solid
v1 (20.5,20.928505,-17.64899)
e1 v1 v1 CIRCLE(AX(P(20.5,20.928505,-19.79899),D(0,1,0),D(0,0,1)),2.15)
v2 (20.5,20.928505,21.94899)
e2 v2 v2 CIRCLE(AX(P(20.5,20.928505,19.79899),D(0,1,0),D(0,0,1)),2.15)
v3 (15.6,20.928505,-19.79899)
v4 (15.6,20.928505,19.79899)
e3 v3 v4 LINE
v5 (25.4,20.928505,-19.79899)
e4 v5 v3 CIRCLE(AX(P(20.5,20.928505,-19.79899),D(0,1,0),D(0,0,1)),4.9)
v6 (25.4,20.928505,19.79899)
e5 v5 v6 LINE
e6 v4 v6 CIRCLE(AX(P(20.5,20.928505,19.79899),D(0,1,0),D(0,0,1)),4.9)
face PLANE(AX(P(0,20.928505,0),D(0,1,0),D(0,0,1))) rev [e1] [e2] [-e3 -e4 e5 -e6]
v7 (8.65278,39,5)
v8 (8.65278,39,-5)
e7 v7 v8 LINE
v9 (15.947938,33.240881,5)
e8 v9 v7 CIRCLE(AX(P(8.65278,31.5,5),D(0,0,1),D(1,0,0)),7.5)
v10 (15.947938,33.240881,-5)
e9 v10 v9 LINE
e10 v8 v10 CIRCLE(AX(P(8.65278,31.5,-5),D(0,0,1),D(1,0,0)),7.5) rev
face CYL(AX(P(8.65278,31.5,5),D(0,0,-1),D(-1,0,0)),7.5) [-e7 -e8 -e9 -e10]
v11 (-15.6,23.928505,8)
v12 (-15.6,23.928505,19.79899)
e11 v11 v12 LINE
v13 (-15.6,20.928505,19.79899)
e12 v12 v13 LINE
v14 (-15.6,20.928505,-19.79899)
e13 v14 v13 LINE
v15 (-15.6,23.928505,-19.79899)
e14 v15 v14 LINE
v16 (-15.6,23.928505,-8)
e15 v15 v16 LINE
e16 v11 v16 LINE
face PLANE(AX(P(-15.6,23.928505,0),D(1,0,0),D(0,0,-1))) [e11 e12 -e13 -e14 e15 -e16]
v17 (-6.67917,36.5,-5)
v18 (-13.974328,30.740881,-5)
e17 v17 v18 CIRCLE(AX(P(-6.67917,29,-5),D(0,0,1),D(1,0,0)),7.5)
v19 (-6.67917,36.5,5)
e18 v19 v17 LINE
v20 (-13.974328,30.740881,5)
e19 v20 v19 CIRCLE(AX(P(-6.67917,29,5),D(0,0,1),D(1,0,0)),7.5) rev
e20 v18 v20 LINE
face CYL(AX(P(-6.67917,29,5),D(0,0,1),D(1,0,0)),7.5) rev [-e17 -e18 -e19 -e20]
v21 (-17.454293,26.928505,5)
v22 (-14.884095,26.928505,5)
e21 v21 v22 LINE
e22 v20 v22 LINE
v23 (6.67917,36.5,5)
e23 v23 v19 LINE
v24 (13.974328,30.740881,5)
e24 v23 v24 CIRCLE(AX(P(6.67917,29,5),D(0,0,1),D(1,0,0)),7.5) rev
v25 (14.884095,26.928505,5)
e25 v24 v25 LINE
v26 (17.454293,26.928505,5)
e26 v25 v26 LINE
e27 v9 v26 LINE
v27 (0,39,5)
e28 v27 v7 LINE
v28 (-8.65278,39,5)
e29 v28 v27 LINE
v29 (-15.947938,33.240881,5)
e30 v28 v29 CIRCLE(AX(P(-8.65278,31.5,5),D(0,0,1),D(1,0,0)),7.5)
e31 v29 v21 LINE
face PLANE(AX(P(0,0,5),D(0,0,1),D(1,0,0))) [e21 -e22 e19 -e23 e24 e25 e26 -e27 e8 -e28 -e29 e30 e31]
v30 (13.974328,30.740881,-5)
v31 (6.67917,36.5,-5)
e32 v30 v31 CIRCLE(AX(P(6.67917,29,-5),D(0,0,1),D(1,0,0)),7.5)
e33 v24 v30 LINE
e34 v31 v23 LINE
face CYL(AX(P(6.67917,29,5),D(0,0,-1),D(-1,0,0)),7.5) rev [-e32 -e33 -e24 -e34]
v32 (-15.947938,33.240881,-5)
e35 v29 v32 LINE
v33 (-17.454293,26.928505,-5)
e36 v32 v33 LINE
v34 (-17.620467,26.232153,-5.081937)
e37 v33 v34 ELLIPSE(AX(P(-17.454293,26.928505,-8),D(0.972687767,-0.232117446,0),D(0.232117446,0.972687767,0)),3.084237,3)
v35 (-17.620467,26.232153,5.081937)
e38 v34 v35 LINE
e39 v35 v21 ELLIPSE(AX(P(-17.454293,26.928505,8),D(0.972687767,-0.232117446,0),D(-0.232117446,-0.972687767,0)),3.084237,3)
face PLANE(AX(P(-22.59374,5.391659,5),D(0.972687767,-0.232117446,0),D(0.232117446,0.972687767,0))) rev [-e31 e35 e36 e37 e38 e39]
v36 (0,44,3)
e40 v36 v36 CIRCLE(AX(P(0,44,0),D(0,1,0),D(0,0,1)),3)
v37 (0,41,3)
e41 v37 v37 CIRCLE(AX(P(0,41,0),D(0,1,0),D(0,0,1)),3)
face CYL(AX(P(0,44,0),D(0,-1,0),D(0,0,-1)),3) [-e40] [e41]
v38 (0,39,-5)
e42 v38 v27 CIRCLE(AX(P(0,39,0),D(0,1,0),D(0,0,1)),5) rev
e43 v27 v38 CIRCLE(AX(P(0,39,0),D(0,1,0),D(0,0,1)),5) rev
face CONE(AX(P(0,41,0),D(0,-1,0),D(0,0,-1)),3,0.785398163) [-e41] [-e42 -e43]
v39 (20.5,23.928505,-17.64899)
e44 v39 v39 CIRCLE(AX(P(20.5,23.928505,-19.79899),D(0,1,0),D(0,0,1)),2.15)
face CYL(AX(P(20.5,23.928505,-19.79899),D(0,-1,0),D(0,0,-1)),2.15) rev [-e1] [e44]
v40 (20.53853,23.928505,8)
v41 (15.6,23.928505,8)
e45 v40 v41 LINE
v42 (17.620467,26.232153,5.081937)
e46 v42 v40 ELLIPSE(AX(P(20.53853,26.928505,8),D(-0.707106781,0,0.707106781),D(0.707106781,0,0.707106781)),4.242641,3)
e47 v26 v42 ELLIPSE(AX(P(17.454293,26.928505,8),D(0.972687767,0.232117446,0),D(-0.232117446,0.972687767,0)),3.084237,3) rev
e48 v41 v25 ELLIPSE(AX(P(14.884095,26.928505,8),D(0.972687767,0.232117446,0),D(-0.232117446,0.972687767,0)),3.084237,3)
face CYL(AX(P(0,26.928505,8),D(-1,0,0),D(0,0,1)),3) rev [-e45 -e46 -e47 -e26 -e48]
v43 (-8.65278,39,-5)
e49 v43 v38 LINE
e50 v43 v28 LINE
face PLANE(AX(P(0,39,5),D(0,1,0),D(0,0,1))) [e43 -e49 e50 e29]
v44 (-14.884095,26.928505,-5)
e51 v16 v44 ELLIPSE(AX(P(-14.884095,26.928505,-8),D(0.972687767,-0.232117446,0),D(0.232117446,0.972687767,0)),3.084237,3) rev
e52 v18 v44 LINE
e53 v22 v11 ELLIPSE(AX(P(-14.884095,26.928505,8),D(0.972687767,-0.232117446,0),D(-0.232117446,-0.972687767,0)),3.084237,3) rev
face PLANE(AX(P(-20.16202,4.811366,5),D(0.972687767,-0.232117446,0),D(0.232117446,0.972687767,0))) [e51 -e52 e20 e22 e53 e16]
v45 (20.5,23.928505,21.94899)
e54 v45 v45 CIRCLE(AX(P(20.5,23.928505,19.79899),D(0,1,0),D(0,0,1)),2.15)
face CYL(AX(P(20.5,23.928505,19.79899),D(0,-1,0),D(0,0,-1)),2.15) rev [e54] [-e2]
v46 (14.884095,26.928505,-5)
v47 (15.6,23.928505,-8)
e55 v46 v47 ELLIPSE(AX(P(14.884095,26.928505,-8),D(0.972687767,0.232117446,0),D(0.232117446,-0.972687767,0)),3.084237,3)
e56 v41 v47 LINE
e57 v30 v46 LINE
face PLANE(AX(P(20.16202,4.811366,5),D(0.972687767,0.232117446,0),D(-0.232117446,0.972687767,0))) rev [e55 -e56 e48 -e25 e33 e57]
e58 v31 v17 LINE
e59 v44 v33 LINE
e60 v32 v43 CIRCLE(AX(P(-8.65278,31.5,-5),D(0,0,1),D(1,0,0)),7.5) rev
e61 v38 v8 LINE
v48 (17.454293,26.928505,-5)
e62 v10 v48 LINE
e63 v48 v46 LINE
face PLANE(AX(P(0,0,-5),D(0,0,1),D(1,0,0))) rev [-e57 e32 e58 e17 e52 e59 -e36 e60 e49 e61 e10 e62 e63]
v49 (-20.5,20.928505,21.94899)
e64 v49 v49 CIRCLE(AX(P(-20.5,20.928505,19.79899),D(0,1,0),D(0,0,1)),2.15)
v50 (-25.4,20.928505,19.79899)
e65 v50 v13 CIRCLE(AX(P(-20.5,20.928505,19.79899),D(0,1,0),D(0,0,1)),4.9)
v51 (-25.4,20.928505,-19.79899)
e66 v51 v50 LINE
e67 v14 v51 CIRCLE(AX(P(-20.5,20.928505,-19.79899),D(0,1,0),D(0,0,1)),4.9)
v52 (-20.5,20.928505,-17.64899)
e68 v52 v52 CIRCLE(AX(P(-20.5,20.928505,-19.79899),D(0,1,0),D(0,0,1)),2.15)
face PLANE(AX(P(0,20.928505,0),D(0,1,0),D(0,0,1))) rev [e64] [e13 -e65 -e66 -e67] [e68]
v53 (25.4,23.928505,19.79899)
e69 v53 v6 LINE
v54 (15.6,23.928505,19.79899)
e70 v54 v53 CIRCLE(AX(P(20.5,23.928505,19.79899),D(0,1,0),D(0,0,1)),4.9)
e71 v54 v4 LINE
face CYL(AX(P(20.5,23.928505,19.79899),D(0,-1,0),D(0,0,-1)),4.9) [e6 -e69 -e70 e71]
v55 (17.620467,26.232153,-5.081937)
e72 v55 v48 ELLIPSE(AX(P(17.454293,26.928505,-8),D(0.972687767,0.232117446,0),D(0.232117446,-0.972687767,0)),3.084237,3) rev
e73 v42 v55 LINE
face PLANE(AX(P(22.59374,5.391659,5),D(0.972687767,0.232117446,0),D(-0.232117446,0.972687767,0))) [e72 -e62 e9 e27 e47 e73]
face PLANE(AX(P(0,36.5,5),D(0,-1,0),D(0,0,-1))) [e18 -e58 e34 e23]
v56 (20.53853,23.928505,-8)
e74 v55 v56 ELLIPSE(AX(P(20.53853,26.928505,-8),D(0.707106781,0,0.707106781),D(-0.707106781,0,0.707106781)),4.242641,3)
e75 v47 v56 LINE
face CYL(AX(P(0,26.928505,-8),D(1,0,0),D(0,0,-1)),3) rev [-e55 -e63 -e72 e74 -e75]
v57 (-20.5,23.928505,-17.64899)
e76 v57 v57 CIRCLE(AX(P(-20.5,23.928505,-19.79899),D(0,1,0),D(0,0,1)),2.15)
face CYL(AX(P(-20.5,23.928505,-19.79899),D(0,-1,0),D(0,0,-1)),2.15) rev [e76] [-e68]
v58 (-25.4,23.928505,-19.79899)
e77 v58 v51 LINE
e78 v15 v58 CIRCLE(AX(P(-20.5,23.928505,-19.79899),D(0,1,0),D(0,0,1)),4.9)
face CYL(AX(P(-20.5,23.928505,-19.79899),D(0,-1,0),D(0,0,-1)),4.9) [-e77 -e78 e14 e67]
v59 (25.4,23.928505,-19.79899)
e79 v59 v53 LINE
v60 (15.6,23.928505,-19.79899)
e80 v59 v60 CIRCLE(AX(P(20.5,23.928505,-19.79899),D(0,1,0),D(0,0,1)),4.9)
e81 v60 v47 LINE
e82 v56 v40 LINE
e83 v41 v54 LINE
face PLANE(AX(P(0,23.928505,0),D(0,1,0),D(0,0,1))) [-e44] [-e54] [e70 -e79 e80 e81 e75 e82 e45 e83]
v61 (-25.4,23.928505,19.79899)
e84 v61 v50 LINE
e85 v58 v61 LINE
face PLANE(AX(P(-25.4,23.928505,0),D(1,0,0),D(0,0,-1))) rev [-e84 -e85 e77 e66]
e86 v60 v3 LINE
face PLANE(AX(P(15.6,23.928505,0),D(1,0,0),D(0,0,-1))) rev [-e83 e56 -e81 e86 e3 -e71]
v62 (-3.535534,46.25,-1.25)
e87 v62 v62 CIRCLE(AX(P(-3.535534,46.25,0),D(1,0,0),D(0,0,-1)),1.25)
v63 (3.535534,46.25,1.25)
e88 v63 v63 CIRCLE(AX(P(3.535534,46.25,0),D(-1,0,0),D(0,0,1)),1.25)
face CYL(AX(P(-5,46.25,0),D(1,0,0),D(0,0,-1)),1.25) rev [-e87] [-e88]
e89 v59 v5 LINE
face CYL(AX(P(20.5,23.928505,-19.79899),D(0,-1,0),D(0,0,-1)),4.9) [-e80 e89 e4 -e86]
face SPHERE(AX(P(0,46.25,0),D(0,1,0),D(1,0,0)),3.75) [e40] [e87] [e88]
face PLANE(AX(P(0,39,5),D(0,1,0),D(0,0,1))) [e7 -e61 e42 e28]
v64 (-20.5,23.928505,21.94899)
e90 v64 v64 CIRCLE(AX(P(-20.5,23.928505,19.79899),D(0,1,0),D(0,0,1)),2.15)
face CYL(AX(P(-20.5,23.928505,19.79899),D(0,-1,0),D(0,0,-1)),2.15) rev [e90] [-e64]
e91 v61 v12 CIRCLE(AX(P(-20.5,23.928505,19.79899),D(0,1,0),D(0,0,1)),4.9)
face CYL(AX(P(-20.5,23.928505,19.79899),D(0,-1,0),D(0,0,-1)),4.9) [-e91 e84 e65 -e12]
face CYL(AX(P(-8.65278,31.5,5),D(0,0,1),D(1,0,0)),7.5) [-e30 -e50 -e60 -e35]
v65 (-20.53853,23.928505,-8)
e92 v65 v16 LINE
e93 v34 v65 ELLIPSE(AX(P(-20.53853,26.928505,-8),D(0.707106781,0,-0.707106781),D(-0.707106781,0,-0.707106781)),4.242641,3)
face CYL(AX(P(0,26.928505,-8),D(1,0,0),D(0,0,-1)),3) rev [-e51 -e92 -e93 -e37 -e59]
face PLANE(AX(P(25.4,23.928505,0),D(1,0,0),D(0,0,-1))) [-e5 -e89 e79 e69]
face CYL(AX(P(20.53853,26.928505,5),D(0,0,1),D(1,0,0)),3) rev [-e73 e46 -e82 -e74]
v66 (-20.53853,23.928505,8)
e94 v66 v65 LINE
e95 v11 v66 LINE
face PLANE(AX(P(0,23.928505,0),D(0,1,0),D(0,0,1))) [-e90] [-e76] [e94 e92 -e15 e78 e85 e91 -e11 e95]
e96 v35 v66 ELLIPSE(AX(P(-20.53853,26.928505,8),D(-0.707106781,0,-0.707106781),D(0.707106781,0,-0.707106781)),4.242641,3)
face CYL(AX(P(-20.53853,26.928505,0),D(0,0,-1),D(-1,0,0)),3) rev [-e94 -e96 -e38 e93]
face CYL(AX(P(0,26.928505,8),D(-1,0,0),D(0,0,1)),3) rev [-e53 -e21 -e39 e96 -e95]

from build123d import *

# Parameters (mm, degrees)
SKETCH_4_R          = 4.9
SKETCH_4_R_2        = 2.15
EXTRUDE_1_DEPTH     = 3
EXTRUDE_2_DEPTH     = 5
FILLET_1_R          = 7.5
FILLET_2_R          = 3
SKETCH_8_R          = 3
EXTRUDE_3_DEPTH     = 5
SKETCH_10_R         = 1.25
CUT_EXTRUDE_1_DEPTH = 5
CHAMFER_1_SIZE      = 2


# Some blends are built 0.0001 mm under size
with BuildPart() as part:
    # ｽｹｯﾁ4 → ﾎﾞｽ - 押し出し1 (new body)
    # profile 1 of 6: a face of its own
    with BuildSketch(Plane(origin=(0, 20.928505024, 0), x_dir=(1, 0, 0), z_dir=(0, 1, 0))):
        with Locations((-20.5, 19.798989873)):
            Circle(SKETCH_4_R)
        with Locations(Location((-20.5, 19.798989873, 0), (0, 0, 270))):
            Circle(SKETCH_4_R_2, mode=Mode.SUBTRACT)
    # profile 2 of 6: a face of its own
    with BuildSketch(Plane(origin=(0, 20.928505024, 0), x_dir=(1, 0, 0), z_dir=(0, 1, 0))):
        with BuildLine():
            Line((-15.6, -19.798989873), (-15.6, 19.798989873))
            ThreePointArc((-15.6, 19.798989873), (-20.5, 14.898989873), (-25.4, 19.798989873))
            Line((-25.4, 19.798989873), (-25.4, -19.798989873))
            ThreePointArc((-25.4, -19.798989873), (-20.5, -14.898989873), (-15.6, -19.798989873))
        make_face()
    # profile 3 of 6: a face of its own
    with BuildSketch(Plane(origin=(0, 20.928505024, 0), x_dir=(1, 0, 0), z_dir=(0, 1, 0))):
        with Locations((-20.5, -19.798989873)):
            Circle(SKETCH_4_R)
        with Locations(Location((-20.5, -19.798989873, 0), (0, 0, 270))):
            Circle(SKETCH_4_R_2, mode=Mode.SUBTRACT)
    # profile 4 of 6: a face of its own
    with BuildSketch(Plane(origin=(0, 20.928505024, 0), x_dir=(1, 0, 0), z_dir=(0, 1, 0))):
        with BuildLine():
            Line((25.4, -19.798989873), (25.4, 19.798989873))
            ThreePointArc((25.4, 19.798989873), (20.5, 14.898989873), (15.6, 19.798989873))
            Line((15.6, 19.798989873), (15.6, -19.798989873))
            ThreePointArc((15.6, -19.798989873), (20.5, -14.898989873), (25.4, -19.798989873))
        make_face()
    # profile 5 of 6: a face of its own
    with BuildSketch(Plane(origin=(0, 20.928505024, 0), x_dir=(1, 0, 0), z_dir=(0, 1, 0))):
        with Locations((20.5, 19.798989873)):
            Circle(SKETCH_4_R)
        with Locations(Location((20.5, 19.798989873, 0), (0, 0, 270))):
            Circle(SKETCH_4_R_2, mode=Mode.SUBTRACT)
    # profile 6 of 6: a face of its own
    with BuildSketch(Plane(origin=(0, 20.928505024, 0), x_dir=(1, 0, 0), z_dir=(0, 1, 0))):
        with Locations((20.5, -19.798989873)):
            Circle(SKETCH_4_R)
        with Locations(Location((20.5, -19.798989873, 0), (0, 0, 270))):
            Circle(SKETCH_4_R_2, mode=Mode.SUBTRACT)
    extrude(amount=EXTRUDE_1_DEPTH)

    # ｽｹｯﾁ7 → ﾎﾞｽ - 押し出し2 (add, symmetric)
    with BuildSketch(Plane.XY):
        Polygon((-18.170197843, 23.928505024), (-15.6, 23.928505024), (-12.6, 36.5), (12.6, 36.5), (15.6, 23.928505024), (18.170197843, 23.928505024), (14.573610085, 39), (-14.573610085, 39), align=None)
    extrude(amount=EXTRUDE_2_DEPTH, both=True)

    # ﾌｨﾚｯﾄ1
    fillet_1_edges = [part.edges().sort_by_distance(p)[0] for p in [
        (14.573610085, 39, 0),
        (-14.573610085, 39, 0),
        (-12.6, 36.5, 0),
        (12.6, 36.5, 0),
    ]]
    fillet(fillet_1_edges, radius=FILLET_1_R)

    # ﾌｨﾚｯﾄ2
    # the kernel refuses this fillet: 3 mm, written as the material it adds along each edge
    with BuildSketch(Plane(origin=(-25.670197843, 23.928505024, -5), x_dir=(0, 1, 0), z_dir=(1, 0, 0))) as fillet_2_piece_1_section:
        with BuildLine():
            CenterArc((FILLET_2_R, -FILLET_2_R), FILLET_2_R, 90, 90)
            Line((0, -FILLET_2_R), (0, 0))
            Line((0, 0), (FILLET_2_R, 0))
        make_face()
    fillet_2_piece_1 = extrude(amount=10.070197843, mode=Mode.PRIVATE)
    fillet_2_piece_1 = split(fillet_2_piece_1, bisect_by=Plane(origin=(-15.521132181, 24.259000487, -5.703490697), z_dir=(-0.9726877666985287, 0.232117445520643, 0)), keep=Keep.TOP, mode=Mode.PRIVATE)
    fillet_2_piece_1 = split(fillet_2_piece_1, bisect_by=Plane(origin=(-17.952851598, 24.839294101, -5.703490697), z_dir=(0.9726877666985286, -0.23211744552064312, 0)), keep=Keep.TOP, mode=Mode.PRIVATE)
    add(fillet_2_piece_1)
    with BuildSketch(Plane(origin=(-25.670197843, 23.928505024, -5), x_dir=(0, 1, 0), z_dir=(1, 0, 0))) as fillet_2_piece_2_section:
        with BuildLine():
            CenterArc((FILLET_2_R, -FILLET_2_R), FILLET_2_R, 90, 90)
            Line((0, -FILLET_2_R), (0, 0))
            Line((0, 0), (FILLET_2_R, 0))
        make_face()
    fillet_2_piece_2 = extrude(amount=17.570197843, mode=Mode.PRIVATE)
    fillet_2_piece_2 = split(fillet_2_piece_2, bisect_by=Plane(origin=(-15.300371441, 25.184098001, -5.319417538), z_dir=(-0.9726877666985287, 0.232117445520643, 0)), keep=Keep.TOP, mode=Mode.PRIVATE)
    fillet_2_piece_2 = split(fillet_2_piece_2, bisect_by=Plane(origin=(-15.6, 25.218859179, -5.319417538), z_dir=(1, 0, 0)), keep=Keep.TOP, mode=Mode.PRIVATE)
    add(fillet_2_piece_2)
    with BuildSketch(Plane(origin=(-18.170197843, 23.928505024, 5), x_dir=(-1, 0, 0), z_dir=(0, 0, -1)), Plane(origin=(18.170197843, 23.928505024, -5), x_dir=(1, 0, 0), z_dir=(0, 0, 1))) as fillet_2_piece_3:
        with BuildLine():
            CenterArc((FILLET_2_R * 0.789444034118, FILLET_2_R), FILLET_2_R, 193.421766737, 76.578233263)
            Line((-FILLET_2_R * 0.183243732581, FILLET_2_R * 0.767882554479), (0, 0))
            Line((0, 0), (FILLET_2_R * 0.789444034118, 0))
        make_face()
    extrude(amount=10)
    with BuildSketch(Plane(origin=(8.1, 23.928505024, -5), x_dir=(0, 1, 0), z_dir=(1, 0, 0))) as fillet_2_piece_4_section:
        with BuildLine():
            CenterArc((FILLET_2_R, -FILLET_2_R), FILLET_2_R, 90, 90)
            Line((0, -FILLET_2_R), (0, 0))
            Line((0, 0), (FILLET_2_R, 0))
        make_face()
    fillet_2_piece_4 = extrude(amount=17.570197843, mode=Mode.PRIVATE)
    fillet_2_piece_4 = split(fillet_2_piece_4, bisect_by=Plane(origin=(15.300371441, 25.184098001, -5.319417538), z_dir=(0.9726877666985287, 0.23211744552064287, 0)), keep=Keep.TOP, mode=Mode.PRIVATE)
    fillet_2_piece_4 = split(fillet_2_piece_4, bisect_by=Plane(origin=(15.6, 25.218859179, -5.319417538), z_dir=(-1, 0, 0)), keep=Keep.TOP, mode=Mode.PRIVATE)
    add(fillet_2_piece_4)
    with BuildSketch(Plane(origin=(15.6, 23.928505024, -5), x_dir=(0, 1, 0), z_dir=(1, 0, 0))) as fillet_2_piece_5_section:
        with BuildLine():
            CenterArc((FILLET_2_R, -FILLET_2_R), FILLET_2_R, 90, 90)
            Line((0, -FILLET_2_R), (0, 0))
            Line((0, 0), (FILLET_2_R, 0))
        make_face()
    fillet_2_piece_5 = extrude(amount=10.070197843, mode=Mode.PRIVATE)
    fillet_2_piece_5 = split(fillet_2_piece_5, bisect_by=Plane(origin=(15.521132181, 24.259000487, -5.703490697), z_dir=(0.9726877666985287, 0.23211744552064287, 0)), keep=Keep.TOP, mode=Mode.PRIVATE)
    fillet_2_piece_5 = split(fillet_2_piece_5, bisect_by=Plane(origin=(17.952851598, 24.839294101, -5.703490697), z_dir=(-0.9726877666985286, -0.23211744552064312, 0)), keep=Keep.TOP, mode=Mode.PRIVATE)
    add(fillet_2_piece_5)
    with BuildSketch(Plane(origin=(-25.670197843, 23.928505024, 5), x_dir=(0, 1, 0), z_dir=(1, 0, 0))) as fillet_2_piece_6_section:
        with BuildLine():
            CenterArc((FILLET_2_R, FILLET_2_R), FILLET_2_R, 180, 90)
            Line((0, FILLET_2_R), (0, 0))
            Line((0, 0), (FILLET_2_R, 0))
        make_face()
    fillet_2_piece_6 = extrude(amount=10.070197843, mode=Mode.PRIVATE)
    fillet_2_piece_6 = split(fillet_2_piece_6, bisect_by=Plane(origin=(-15.521132181, 24.259000487, 5.703490697), z_dir=(-0.9726877666985287, 0.232117445520643, 0)), keep=Keep.TOP, mode=Mode.PRIVATE)
    fillet_2_piece_6 = split(fillet_2_piece_6, bisect_by=Plane(origin=(-17.952851598, 24.839294101, 5.703490697), z_dir=(0.9726877666985286, -0.23211744552064312, 0)), keep=Keep.TOP, mode=Mode.PRIVATE)
    add(fillet_2_piece_6)
    with BuildSketch(Plane(origin=(-25.670197843, 23.928505024, 5), x_dir=(0, 1, 0), z_dir=(1, 0, 0))) as fillet_2_piece_7_section:
        with BuildLine():
            CenterArc((FILLET_2_R, FILLET_2_R), FILLET_2_R, 180, 90)
            Line((0, FILLET_2_R), (0, 0))
            Line((0, 0), (FILLET_2_R, 0))
        make_face()
    fillet_2_piece_7 = extrude(amount=17.570197843, mode=Mode.PRIVATE)
    fillet_2_piece_7 = split(fillet_2_piece_7, bisect_by=Plane(origin=(-15.300371441, 25.184098001, 5.319417538), z_dir=(-0.9726877666985287, 0.232117445520643, 0)), keep=Keep.TOP, mode=Mode.PRIVATE)
    fillet_2_piece_7 = split(fillet_2_piece_7, bisect_by=Plane(origin=(-15.6, 25.218859179, 5.319417538), z_dir=(1, 0, 0)), keep=Keep.TOP, mode=Mode.PRIVATE)
    add(fillet_2_piece_7)
    with BuildSketch(Plane(origin=(8.1, 23.928505024, 5), x_dir=(0, 1, 0), z_dir=(1, 0, 0))) as fillet_2_piece_8_section:
        with BuildLine():
            CenterArc((FILLET_2_R, FILLET_2_R), FILLET_2_R, 180, 90)
            Line((0, FILLET_2_R), (0, 0))
            Line((0, 0), (FILLET_2_R, 0))
        make_face()
    fillet_2_piece_8 = extrude(amount=17.570197843, mode=Mode.PRIVATE)
    fillet_2_piece_8 = split(fillet_2_piece_8, bisect_by=Plane(origin=(15.300371441, 25.184098001, 5.319417538), z_dir=(0.9726877666985287, 0.23211744552064287, 0)), keep=Keep.TOP, mode=Mode.PRIVATE)
    fillet_2_piece_8 = split(fillet_2_piece_8, bisect_by=Plane(origin=(15.6, 25.218859179, 5.319417538), z_dir=(-1, 0, 0)), keep=Keep.TOP, mode=Mode.PRIVATE)
    add(fillet_2_piece_8)
    with BuildSketch(Plane(origin=(15.6, 23.928505024, 5), x_dir=(0, 1, 0), z_dir=(1, 0, 0))) as fillet_2_piece_9_section:
        with BuildLine():
            CenterArc((FILLET_2_R, FILLET_2_R), FILLET_2_R, 180, 90)
            Line((0, FILLET_2_R), (0, 0))
            Line((0, 0), (FILLET_2_R, 0))
        make_face()
    fillet_2_piece_9 = extrude(amount=10.070197843, mode=Mode.PRIVATE)
    fillet_2_piece_9 = split(fillet_2_piece_9, bisect_by=Plane(origin=(15.521132181, 24.259000487, 5.703490697), z_dir=(0.9726877666985287, 0.23211744552064287, 0)), keep=Keep.TOP, mode=Mode.PRIVATE)
    fillet_2_piece_9 = split(fillet_2_piece_9, bisect_by=Plane(origin=(17.952851598, 24.839294101, 5.703490697), z_dir=(-0.9726877666985286, -0.23211744552064312, 0)), keep=Keep.TOP, mode=Mode.PRIVATE)
    add(fillet_2_piece_9)
    with BuildSketch(Plane(origin=(-25.670197843, 23.928505024, -5), x_dir=(0, 1, 0), z_dir=(1, 0, 0))) as fillet_2_piece_10a_section:
        with BuildLine():
            CenterArc((FILLET_2_R, -FILLET_2_R), FILLET_2_R, 90, 90)
            Line((0, -FILLET_2_R), (0, 0))
            Line((0, 0), (FILLET_2_R, 0))
        make_face()
    fillet_2_piece_10a = extrude(amount=10.070197843, mode=Mode.PRIVATE)
    fillet_2_piece_10a = split(fillet_2_piece_10a, bisect_by=Plane(origin=(-18.204116429, 23.786369246, -5.671207776), z_dir=(-0.9726877666985286, 0.23211744552064312, 0)), keep=Keep.TOP, mode=Mode.PRIVATE)
    fillet_2_piece_10a = split(fillet_2_piece_10a, bisect_by=Plane(origin=(-25.4, 24.621194187, -5.671207776), z_dir=(1, 0, 0)), keep=Keep.TOP, mode=Mode.PRIVATE)
    with BuildSketch(Plane(origin=(-18.170197843, 23.928505024, 5), x_dir=(-1, 0, 0), z_dir=(0, 0, -1))) as fillet_2_piece_10b_section:
        with BuildLine():
            CenterArc((FILLET_2_R * 0.789444034118, FILLET_2_R), FILLET_2_R, 193.421766737, 76.578233263)
            Line((-FILLET_2_R * 0.183243732581, FILLET_2_R * 0.767882554479), (0, 0))
            Line((0, 0), (FILLET_2_R * 0.789444034118, 0))
        make_face()
    fillet_2_piece_10b = extrude(amount=15.920830256, mode=Mode.PRIVATE)
    fillet_2_piece_10b = split(fillet_2_piece_10b, bisect_by=Plane(origin=(-18.572539965, 24.43815752, -5), z_dir=(0, 0, -1)), keep=Keep.TOP, mode=Mode.PRIVATE)
    fillet_2_piece_10 = fillet_2_piece_10a & fillet_2_piece_10b
    add(fillet_2_piece_10)
    with BuildSketch(Plane(origin=(-25.670197843, 23.928505024, 5), x_dir=(0, 1, 0), z_dir=(1, 0, 0))) as fillet_2_piece_11a_section:
        with BuildLine():
            CenterArc((FILLET_2_R, FILLET_2_R), FILLET_2_R, 180, 90)
            Line((0, FILLET_2_R), (0, 0))
            Line((0, 0), (FILLET_2_R, 0))
        make_face()
    fillet_2_piece_11a = extrude(amount=10.070197843, mode=Mode.PRIVATE)
    fillet_2_piece_11a = split(fillet_2_piece_11a, bisect_by=Plane(origin=(-18.204116429, 23.786369246, 5.671207776), z_dir=(-0.9726877666985286, 0.23211744552064312, 0)), keep=Keep.TOP, mode=Mode.PRIVATE)
    fillet_2_piece_11a = split(fillet_2_piece_11a, bisect_by=Plane(origin=(-25.4, 24.621194187, 5.671207776), z_dir=(1, 0, 0)), keep=Keep.TOP, mode=Mode.PRIVATE)
    with BuildSketch(Plane(origin=(-18.170197843, 23.928505024, 10.920830256), x_dir=(-1, 0, 0), z_dir=(0, 0, -1))) as fillet_2_piece_11b_section:
        with BuildLine():
            CenterArc((FILLET_2_R * 0.789444034118, FILLET_2_R), FILLET_2_R, 193.421766737, 76.578233263)
            Line((-FILLET_2_R * 0.183243732581, FILLET_2_R * 0.767882554479), (0, 0))
            Line((0, 0), (FILLET_2_R * 0.789444034118, 0))
        make_face()
    fillet_2_piece_11b = extrude(amount=15.920830256, mode=Mode.PRIVATE)
    fillet_2_piece_11b = split(fillet_2_piece_11b, bisect_by=Plane(origin=(-18.572539965, 24.43815752, 5), z_dir=(0, 0, 1)), keep=Keep.TOP, mode=Mode.PRIVATE)
    fillet_2_piece_11 = fillet_2_piece_11a & fillet_2_piece_11b
    add(fillet_2_piece_11)
    with BuildSketch(Plane(origin=(15.6, 23.928505024, -5), x_dir=(0, 1, 0), z_dir=(1, 0, 0))) as fillet_2_piece_12a_section:
        with BuildLine():
            CenterArc((FILLET_2_R, -FILLET_2_R), FILLET_2_R, 90, 90)
            Line((0, -FILLET_2_R), (0, 0))
            Line((0, 0), (FILLET_2_R, 0))
        make_face()
    fillet_2_piece_12a = extrude(amount=10.070197843, mode=Mode.PRIVATE)
    fillet_2_piece_12a = split(fillet_2_piece_12a, bisect_by=Plane(origin=(18.204116429, 23.786369246, -5.671207776), z_dir=(0.9726877666985286, 0.23211744552064312, 0)), keep=Keep.TOP, mode=Mode.PRIVATE)
    fillet_2_piece_12a = split(fillet_2_piece_12a, bisect_by=Plane(origin=(25.4, 24.621194187, -5.671207776), z_dir=(-1, 0, 0)), keep=Keep.TOP, mode=Mode.PRIVATE)
    with BuildSketch(Plane(origin=(18.170197843, 23.928505024, -10.920830256), x_dir=(1, 0, 0), z_dir=(0, 0, 1))) as fillet_2_piece_12b_section:
        with BuildLine():
            CenterArc((FILLET_2_R * 0.789444034118, FILLET_2_R), FILLET_2_R, 193.421766737, 76.578233263)
            Line((-FILLET_2_R * 0.183243732581, FILLET_2_R * 0.767882554479), (0, 0))
            Line((0, 0), (FILLET_2_R * 0.789444034118, 0))
        make_face()
    fillet_2_piece_12b = extrude(amount=15.920830256, mode=Mode.PRIVATE)
    fillet_2_piece_12b = split(fillet_2_piece_12b, bisect_by=Plane(origin=(18.572539965, 24.43815752, -5), z_dir=(0, 0, -1)), keep=Keep.TOP, mode=Mode.PRIVATE)
    fillet_2_piece_12 = fillet_2_piece_12a & fillet_2_piece_12b
    add(fillet_2_piece_12)
    with BuildSketch(Plane(origin=(15.6, 23.928505024, 5), x_dir=(0, 1, 0), z_dir=(1, 0, 0))) as fillet_2_piece_13a_section:
        with BuildLine():
            CenterArc((FILLET_2_R, FILLET_2_R), FILLET_2_R, 180, 90)
            Line((0, FILLET_2_R), (0, 0))
            Line((0, 0), (FILLET_2_R, 0))
        make_face()
    fillet_2_piece_13a = extrude(amount=10.070197843, mode=Mode.PRIVATE)
    fillet_2_piece_13a = split(fillet_2_piece_13a, bisect_by=Plane(origin=(18.204116429, 23.786369246, 5.671207776), z_dir=(0.9726877666985286, 0.23211744552064312, 0)), keep=Keep.TOP, mode=Mode.PRIVATE)
    fillet_2_piece_13a = split(fillet_2_piece_13a, bisect_by=Plane(origin=(25.4, 24.621194187, 5.671207776), z_dir=(-1, 0, 0)), keep=Keep.TOP, mode=Mode.PRIVATE)
    with BuildSketch(Plane(origin=(18.170197843, 23.928505024, -5), x_dir=(1, 0, 0), z_dir=(0, 0, 1))) as fillet_2_piece_13b_section:
        with BuildLine():
            CenterArc((FILLET_2_R * 0.789444034118, FILLET_2_R), FILLET_2_R, 193.421766737, 76.578233263)
            Line((-FILLET_2_R * 0.183243732581, FILLET_2_R * 0.767882554479), (0, 0))
            Line((0, 0), (FILLET_2_R * 0.789444034118, 0))
        make_face()
    fillet_2_piece_13b = extrude(amount=15.920830256, mode=Mode.PRIVATE)
    fillet_2_piece_13b = split(fillet_2_piece_13b, bisect_by=Plane(origin=(18.572539965, 24.43815752, 5), z_dir=(0, 0, 1)), keep=Keep.TOP, mode=Mode.PRIVATE)
    fillet_2_piece_13 = fillet_2_piece_13a & fillet_2_piece_13b
    add(fillet_2_piece_13)

    # ｽｹｯﾁ8 → ﾎﾞｽ - 押し出し3 (add)
    with BuildSketch(Plane(origin=(0, 39, 0), x_dir=(1, 0, 0), z_dir=(0, 1, 0))):
        with Locations(Location((0, 0, 0), (0, 0, 270))):
            Circle(SKETCH_8_R)
    extrude(amount=EXTRUDE_3_DEPTH)

    # ｽｹｯﾁ9 one side → 回転1 (revolve)
    with BuildSketch(Plane.XY):
        with BuildLine():
            ThreePointArc((0, 42.5), (2.651650429, 43.59834957), (3.75, 46.25))
            ThreePointArc((3.75, 46.25), (2.651650429, 48.901650429), (0, 50))
            Line((0, 50), (0, 42.5))
        make_face()
    revolve(axis=Axis((0, 50, 0), (0, -1, 0)))

    # ｽｹｯﾁ10 → ｶｯﾄ - 押し出し1 (cut, symmetric)
    with BuildSketch(Plane(origin=(0, 0, 0), x_dir=(0, 0, -1), z_dir=(1, 0, 0))):
        with Locations((0, 46.25)):
            Circle(SKETCH_10_R)
    extrude(amount=CUT_EXTRUDE_1_DEPTH, both=True, mode=Mode.SUBTRACT)

    # 面取り1
    chamfer_1_edges = [part.edges().sort_by_distance(p)[0] for p in [
        (0, 39, -3),
    ]]
    chamfer(chamfer_1_edges, length=CHAMFER_1_SIZE - 0.0001)  # a hair under: the kernel refuses the full size


solid = part.part
